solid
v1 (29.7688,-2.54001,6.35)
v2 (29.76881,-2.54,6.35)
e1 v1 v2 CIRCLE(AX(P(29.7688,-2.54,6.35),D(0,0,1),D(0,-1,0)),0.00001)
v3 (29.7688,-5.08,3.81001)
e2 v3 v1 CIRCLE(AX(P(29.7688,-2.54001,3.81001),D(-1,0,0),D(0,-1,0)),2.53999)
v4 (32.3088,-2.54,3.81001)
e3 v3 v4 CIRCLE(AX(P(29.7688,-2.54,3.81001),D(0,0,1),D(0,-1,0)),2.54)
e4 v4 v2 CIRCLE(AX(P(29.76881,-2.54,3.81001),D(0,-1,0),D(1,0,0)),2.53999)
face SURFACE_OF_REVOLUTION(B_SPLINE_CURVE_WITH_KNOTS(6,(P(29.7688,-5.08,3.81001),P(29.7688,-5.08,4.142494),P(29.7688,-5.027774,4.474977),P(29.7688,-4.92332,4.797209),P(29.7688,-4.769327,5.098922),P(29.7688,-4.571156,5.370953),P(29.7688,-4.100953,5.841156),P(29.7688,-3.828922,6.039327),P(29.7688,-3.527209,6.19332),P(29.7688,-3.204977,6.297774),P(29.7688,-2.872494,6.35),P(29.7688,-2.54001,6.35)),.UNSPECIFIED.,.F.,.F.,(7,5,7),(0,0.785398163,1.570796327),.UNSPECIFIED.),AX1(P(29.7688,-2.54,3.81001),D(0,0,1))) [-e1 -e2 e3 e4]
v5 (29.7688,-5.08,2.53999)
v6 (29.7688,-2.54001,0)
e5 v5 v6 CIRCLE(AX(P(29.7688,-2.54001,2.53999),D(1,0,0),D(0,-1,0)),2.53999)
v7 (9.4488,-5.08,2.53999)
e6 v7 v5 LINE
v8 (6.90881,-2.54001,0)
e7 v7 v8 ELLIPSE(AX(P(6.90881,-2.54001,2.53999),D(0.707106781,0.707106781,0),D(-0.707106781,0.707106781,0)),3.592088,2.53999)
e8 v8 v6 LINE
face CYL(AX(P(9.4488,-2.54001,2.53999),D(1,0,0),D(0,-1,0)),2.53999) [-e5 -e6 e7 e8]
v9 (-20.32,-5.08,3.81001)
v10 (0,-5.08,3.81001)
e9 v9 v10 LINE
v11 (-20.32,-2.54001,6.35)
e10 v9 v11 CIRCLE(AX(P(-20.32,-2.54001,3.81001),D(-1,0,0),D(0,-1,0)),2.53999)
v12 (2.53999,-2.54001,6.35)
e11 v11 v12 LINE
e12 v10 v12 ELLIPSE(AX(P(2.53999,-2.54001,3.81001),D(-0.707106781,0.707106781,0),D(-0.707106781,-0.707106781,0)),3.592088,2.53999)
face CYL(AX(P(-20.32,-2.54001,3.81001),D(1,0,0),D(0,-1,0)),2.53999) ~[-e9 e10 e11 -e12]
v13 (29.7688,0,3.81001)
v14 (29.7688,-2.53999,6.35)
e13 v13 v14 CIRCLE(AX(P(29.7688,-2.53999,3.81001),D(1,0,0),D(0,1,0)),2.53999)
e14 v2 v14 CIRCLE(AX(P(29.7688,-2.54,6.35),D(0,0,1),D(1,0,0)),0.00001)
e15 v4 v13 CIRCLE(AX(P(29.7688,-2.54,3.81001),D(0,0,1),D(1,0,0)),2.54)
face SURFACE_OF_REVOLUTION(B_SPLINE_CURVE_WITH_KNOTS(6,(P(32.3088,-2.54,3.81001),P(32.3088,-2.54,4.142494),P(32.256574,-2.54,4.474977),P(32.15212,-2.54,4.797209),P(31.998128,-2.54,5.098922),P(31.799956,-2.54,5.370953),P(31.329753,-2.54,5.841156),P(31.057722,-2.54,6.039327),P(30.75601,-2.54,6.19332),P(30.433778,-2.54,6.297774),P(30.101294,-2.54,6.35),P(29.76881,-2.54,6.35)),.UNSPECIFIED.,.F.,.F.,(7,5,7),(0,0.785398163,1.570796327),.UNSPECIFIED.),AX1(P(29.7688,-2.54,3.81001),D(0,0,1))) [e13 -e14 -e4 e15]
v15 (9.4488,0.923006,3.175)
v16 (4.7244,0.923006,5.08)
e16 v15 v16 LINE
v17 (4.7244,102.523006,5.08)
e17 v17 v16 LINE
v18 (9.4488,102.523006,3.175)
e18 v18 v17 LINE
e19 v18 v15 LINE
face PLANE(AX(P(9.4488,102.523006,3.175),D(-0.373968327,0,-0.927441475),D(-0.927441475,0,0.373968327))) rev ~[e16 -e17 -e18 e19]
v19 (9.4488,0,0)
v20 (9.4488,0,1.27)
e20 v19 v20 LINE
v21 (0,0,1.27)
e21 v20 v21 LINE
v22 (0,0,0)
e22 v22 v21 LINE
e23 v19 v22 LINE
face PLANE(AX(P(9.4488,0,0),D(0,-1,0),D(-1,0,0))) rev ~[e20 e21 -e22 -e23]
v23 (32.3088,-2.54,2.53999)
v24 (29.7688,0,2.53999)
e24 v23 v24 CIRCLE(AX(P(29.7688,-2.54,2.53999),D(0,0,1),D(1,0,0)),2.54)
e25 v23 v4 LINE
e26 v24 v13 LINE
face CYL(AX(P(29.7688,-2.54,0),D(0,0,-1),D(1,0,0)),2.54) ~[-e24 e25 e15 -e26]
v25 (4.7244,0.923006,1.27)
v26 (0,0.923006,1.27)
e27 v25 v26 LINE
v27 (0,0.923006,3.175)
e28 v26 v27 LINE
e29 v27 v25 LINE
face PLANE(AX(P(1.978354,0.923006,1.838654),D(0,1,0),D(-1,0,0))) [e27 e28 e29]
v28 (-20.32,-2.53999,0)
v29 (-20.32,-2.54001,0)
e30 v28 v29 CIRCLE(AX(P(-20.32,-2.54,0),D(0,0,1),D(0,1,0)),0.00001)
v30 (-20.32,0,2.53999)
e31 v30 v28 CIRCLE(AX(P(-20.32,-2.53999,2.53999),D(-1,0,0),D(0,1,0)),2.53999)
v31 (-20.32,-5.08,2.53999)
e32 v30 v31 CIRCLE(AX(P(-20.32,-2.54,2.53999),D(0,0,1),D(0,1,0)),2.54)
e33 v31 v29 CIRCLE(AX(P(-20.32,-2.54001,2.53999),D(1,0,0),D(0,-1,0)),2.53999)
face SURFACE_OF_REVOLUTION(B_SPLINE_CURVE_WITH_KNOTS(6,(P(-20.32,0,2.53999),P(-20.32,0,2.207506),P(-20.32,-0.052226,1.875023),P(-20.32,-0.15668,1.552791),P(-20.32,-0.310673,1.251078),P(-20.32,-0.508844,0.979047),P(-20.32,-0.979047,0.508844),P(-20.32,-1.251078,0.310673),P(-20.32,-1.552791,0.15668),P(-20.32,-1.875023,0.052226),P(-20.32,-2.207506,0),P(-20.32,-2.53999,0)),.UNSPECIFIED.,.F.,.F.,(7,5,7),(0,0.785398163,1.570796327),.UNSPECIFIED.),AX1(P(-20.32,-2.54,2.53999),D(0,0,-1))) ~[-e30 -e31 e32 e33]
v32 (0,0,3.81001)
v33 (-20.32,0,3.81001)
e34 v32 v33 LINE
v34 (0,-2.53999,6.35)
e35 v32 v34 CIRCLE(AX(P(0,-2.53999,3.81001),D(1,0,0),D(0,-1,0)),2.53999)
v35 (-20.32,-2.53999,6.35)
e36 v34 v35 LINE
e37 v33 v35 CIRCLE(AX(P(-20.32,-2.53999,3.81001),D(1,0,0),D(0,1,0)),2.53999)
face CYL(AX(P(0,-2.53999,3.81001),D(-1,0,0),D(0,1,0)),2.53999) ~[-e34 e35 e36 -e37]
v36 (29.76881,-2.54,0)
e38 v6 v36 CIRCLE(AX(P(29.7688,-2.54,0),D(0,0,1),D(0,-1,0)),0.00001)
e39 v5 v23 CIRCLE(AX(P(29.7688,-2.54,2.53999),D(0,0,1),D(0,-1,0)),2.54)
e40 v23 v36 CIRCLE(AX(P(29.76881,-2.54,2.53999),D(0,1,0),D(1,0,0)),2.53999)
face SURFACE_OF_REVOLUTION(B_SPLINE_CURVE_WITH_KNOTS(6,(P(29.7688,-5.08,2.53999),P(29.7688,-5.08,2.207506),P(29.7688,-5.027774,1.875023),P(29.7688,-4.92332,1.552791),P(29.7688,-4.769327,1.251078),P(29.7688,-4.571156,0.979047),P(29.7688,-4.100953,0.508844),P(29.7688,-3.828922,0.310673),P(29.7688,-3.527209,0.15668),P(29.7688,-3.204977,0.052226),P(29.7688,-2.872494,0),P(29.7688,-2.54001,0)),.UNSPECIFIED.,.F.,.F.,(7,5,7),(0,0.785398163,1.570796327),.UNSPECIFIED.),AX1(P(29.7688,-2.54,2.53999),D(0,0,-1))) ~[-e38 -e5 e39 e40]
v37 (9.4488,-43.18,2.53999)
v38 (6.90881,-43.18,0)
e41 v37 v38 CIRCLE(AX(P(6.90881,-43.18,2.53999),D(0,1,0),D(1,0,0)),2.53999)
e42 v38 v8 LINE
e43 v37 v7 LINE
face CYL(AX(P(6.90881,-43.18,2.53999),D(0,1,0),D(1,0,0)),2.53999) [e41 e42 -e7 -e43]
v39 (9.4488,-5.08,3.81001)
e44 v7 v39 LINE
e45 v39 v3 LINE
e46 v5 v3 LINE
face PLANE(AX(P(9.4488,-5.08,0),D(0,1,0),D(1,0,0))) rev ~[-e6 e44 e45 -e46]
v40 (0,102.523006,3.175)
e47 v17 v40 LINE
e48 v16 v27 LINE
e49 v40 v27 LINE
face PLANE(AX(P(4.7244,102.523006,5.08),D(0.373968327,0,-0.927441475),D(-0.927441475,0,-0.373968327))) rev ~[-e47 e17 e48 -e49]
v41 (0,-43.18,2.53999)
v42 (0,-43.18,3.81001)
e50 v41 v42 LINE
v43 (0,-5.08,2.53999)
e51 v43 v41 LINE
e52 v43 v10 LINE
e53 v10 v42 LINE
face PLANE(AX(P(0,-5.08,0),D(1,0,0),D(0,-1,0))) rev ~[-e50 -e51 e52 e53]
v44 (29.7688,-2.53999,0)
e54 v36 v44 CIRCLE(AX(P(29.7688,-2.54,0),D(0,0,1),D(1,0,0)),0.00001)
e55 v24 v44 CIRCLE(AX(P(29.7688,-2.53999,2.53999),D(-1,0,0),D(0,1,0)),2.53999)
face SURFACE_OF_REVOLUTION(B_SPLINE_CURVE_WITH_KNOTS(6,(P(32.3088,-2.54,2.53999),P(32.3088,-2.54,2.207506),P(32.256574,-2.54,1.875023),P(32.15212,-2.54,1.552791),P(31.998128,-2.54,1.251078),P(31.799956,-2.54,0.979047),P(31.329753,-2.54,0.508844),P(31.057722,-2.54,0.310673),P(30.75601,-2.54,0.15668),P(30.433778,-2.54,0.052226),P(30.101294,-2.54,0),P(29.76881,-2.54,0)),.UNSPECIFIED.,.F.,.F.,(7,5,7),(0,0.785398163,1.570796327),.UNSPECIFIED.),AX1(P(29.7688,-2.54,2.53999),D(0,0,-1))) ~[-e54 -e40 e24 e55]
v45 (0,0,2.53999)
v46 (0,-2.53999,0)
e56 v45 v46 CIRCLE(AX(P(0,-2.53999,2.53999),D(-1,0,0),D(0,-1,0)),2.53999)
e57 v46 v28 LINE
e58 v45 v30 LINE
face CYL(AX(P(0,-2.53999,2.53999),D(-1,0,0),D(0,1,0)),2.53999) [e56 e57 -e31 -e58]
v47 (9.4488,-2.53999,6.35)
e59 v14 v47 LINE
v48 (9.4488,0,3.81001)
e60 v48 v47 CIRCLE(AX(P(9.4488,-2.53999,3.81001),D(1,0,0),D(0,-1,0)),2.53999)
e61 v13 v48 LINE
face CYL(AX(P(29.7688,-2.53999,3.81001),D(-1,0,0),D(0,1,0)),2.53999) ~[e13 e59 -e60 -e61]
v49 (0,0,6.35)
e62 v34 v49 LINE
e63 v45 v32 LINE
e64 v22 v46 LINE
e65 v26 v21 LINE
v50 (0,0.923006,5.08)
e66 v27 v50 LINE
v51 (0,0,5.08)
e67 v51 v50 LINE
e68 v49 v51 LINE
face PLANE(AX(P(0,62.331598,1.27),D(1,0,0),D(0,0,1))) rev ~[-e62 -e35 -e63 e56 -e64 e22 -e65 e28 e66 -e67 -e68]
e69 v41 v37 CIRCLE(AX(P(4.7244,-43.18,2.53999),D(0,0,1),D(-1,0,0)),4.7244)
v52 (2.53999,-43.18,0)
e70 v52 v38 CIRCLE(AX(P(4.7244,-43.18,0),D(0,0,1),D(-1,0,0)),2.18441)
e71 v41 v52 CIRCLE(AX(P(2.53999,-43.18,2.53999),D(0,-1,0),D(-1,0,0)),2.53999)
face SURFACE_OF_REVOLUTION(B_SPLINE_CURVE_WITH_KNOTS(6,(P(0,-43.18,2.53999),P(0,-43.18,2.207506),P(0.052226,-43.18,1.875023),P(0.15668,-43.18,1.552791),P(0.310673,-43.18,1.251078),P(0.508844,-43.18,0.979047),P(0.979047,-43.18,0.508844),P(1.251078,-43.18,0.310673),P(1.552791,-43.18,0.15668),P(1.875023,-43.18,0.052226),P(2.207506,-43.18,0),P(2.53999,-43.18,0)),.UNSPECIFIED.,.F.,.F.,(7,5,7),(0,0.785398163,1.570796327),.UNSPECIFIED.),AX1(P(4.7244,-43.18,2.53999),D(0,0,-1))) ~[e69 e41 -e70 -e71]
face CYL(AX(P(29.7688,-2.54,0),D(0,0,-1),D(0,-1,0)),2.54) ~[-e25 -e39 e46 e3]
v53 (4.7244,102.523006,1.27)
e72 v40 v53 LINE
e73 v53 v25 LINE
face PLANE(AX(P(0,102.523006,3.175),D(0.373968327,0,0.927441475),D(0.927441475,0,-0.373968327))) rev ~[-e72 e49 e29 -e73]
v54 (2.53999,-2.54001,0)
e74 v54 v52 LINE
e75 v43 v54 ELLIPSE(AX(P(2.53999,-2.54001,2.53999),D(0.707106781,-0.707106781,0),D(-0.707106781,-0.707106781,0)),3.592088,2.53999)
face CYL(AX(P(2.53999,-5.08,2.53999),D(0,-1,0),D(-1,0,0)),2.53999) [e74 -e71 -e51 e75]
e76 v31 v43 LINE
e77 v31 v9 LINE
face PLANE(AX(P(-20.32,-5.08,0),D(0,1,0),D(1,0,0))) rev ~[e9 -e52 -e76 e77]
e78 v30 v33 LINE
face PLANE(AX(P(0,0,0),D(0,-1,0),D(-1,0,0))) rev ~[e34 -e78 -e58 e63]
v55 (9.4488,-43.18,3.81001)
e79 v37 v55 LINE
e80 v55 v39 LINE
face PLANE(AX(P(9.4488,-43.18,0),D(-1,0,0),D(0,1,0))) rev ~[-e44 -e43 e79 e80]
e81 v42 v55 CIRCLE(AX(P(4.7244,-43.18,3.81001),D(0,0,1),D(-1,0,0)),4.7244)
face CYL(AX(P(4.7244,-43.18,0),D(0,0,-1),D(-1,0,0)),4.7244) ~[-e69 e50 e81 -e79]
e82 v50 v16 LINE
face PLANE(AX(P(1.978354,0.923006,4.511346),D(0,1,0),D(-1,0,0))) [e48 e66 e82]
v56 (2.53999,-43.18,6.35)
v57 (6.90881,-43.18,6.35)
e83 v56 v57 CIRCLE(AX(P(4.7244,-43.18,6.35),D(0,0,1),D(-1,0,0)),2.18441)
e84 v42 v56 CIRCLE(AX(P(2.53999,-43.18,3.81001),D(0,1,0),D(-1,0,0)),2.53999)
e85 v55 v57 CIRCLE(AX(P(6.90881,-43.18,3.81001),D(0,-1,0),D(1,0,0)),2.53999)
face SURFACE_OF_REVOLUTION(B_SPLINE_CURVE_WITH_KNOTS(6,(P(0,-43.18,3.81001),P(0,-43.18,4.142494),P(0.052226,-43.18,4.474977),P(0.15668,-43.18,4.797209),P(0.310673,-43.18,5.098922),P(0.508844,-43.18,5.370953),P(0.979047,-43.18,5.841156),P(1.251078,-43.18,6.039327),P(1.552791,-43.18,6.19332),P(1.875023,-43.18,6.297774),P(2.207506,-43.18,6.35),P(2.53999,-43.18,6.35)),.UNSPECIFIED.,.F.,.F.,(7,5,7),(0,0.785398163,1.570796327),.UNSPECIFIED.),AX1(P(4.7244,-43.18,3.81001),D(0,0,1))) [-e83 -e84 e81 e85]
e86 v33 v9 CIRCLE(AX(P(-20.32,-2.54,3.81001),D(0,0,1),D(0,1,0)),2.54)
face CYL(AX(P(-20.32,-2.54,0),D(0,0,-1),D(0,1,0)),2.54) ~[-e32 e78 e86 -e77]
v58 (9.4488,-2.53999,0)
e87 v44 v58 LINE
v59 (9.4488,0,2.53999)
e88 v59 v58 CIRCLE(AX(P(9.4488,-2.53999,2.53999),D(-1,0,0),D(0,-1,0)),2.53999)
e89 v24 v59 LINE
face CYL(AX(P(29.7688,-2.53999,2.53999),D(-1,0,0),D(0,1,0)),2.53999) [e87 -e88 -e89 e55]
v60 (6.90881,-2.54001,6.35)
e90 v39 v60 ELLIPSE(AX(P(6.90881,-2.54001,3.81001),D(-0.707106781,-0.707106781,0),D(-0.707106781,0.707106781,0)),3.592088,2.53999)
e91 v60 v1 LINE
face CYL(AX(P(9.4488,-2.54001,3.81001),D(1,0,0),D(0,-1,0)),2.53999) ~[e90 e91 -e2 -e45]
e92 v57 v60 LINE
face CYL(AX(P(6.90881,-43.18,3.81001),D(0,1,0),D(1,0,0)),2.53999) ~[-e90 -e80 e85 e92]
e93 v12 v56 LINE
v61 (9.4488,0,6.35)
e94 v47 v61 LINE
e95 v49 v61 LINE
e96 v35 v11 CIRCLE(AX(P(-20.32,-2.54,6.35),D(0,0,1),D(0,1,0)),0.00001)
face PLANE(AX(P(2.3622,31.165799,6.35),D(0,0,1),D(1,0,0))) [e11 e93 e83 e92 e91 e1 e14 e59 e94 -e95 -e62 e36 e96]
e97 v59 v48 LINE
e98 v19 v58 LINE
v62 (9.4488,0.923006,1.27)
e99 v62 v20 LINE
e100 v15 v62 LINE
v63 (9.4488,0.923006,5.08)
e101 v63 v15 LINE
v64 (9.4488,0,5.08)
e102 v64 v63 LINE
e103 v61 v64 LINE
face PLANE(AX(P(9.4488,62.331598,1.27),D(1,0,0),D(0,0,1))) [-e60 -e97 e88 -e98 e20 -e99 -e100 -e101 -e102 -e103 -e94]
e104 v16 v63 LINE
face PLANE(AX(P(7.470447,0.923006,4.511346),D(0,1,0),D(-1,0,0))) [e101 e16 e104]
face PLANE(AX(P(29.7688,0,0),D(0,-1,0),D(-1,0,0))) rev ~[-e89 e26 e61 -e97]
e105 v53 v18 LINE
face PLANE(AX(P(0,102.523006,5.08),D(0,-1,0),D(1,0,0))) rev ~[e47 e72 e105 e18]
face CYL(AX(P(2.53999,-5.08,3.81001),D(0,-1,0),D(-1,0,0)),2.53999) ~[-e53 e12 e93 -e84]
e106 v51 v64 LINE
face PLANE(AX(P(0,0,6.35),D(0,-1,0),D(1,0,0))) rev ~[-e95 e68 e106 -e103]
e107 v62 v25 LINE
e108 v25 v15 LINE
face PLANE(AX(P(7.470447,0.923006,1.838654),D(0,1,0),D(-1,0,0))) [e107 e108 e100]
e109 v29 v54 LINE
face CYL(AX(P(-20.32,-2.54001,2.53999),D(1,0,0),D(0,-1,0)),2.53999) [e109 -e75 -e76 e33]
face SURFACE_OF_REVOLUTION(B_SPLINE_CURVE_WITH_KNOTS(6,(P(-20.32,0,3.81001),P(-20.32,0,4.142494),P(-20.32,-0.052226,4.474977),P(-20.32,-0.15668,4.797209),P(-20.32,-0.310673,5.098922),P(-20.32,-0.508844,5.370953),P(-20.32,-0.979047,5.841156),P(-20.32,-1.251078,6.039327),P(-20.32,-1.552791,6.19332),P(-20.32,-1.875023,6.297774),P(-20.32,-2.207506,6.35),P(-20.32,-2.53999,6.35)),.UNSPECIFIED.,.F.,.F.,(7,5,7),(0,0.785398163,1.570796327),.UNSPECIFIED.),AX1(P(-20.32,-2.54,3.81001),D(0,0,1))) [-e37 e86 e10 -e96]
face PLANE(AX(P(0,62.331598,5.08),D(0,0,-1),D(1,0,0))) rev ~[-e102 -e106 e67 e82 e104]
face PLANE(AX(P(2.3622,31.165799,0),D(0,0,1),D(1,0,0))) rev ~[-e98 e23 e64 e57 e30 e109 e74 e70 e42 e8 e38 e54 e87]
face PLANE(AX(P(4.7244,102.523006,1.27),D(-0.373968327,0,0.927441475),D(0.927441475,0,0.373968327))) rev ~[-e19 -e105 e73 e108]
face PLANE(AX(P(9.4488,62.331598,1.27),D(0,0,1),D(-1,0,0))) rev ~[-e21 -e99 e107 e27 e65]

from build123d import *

# Parameters (mm, degrees)
F0_W      = 4.724400118
F0_H      = 62.3315982521
F1_DEPTH  = 6.35
F2_R      = 2.53999
F4_DEPTH  = 1.27
F6_DEPTH  = 1.27
F8_DEPTH  = 25.4
F9_DEPTH  = 50.8
F11_DEPTH = 25.4
F13_DEPTH = 25.4
F15_DEPTH = 101.6


# Not quite as in the source:
# - a fillet or chamfer is up to 0.001 mm smaller than in the source, because OpenCascade refuses the exact size


with BuildPart() as f1:
    # F0 (on Top) → F1 (new body)
    with BuildSketch(Plane.XY):
        with Locations((2.362200059, 31.165799126)):
            Rectangle(F0_W, F0_H)
        with Locations((7.086600177, 31.165799126)):
            Rectangle(F0_W, F0_H)
        Polygon((4.724400118, 75.0454813242), (4.724400118, 62.3315982521), (9.448800236, 62.3315982521), align=None)
        Polygon((4.724400118, 75.0454813242), (0, 62.3315982521), (4.724400118, 62.3315982521), align=None)
        with BuildLine():
            Line((4.724400118, 0), (0, 0))
            Line((0, 0), (-20.32, 0))
            ThreePointArc((-20.32, 0), (-18.5239487758, -0.7439487758), (-17.78, -2.54))
            ThreePointArc((-17.78, -2.54), (-18.5239487758, -4.3360512242), (-20.32, -5.08))
            Line((-20.32, -5.08), (0, -5.08))
            Line((0, -5.08), (9.448800236, -5.08))
            Line((9.448800236, -5.08), (29.768800236, -5.08))
            ThreePointArc((29.768800236, -5.08), (27.228800236, -2.54), (29.768800236, 0))
            Line((29.768800236, 0), (9.448800236, 0))
            Line((9.448800236, 0), (4.724400118, 0))
        make_face()
        with BuildLine():
            Line((9.448800236, -5.08), (0, -5.08))
            Line((0, -5.08), (0, -43.18))
            ThreePointArc((0, -43.18), (4.724400118, -38.455599882), (9.448800236, -43.18))
            Line((9.448800236, -43.18), (9.448800236, -5.08))
        make_face()
        with BuildLine():
            ThreePointArc((-17.78, -2.54), (-18.5239487758, -0.7439487758), (-20.32, 0))
            Line((-20.32, 0), (-20.32, -5.08))
            ThreePointArc((-20.32, -5.08), (-18.5239487758, -4.3360512242), (-17.78, -2.54))
        make_face()
        with BuildLine():
            Line((-20.32, -5.08), (-20.32, 0))
            ThreePointArc((-20.32, 0), (-22.86, -2.54), (-20.32, -5.08))
        make_face()
        with BuildLine():
            Line((29.768800236, -5.08), (29.768800236, 0))
            ThreePointArc((29.768800236, 0), (27.228800236, -2.54), (29.768800236, -5.08))
        make_face()
        with BuildLine():
            ThreePointArc((32.308800236, -2.54), (31.5648514602, -0.7439487758), (29.768800236, 0))
            Line((29.768800236, 0), (29.768800236, -5.08))
            ThreePointArc((29.768800236, -5.08), (31.5648514602, -4.3360512242), (32.308800236, -2.54))
        make_face()
        with BuildLine():
            Line((9.448800236, -43.18), (0, -43.18))
            ThreePointArc((0, -43.18), (4.724400118, -47.904400118), (9.448800236, -43.18))
        make_face()
        with BuildLine():
            ThreePointArc((9.448800236, -43.18), (4.724400118, -38.455599882), (0, -43.18))
            Line((0, -43.18), (9.448800236, -43.18))
        make_face()
    extrude(amount=F1_DEPTH)

    # F2 (radius 2.54 in the source; OpenCascade refuses exactly that, so slightly less here)
    f2_edges = [f1.edges().sort_by_distance(p)[0] for p in [
        (0, -24.13, 6.35),
        (9.4488, -24.13, 6.35),
        (0, -24.13, 0),
        (9.4488, -24.13, 0),
        (19.6088, -5.08, 0),
        (19.6088, 0, 0),
        (-10.16, 0, 0),
        (19.6088, -5.08, 6.35),
        (19.6088, 0, 6.35),
        (-10.16, -5.08, 6.35),
        (-10.16, 0, 6.35),
        (-10.16, -5.08, 0),
    ]]
    fillet(f2_edges, radius=F2_R)

    # F3 (on face) → F4 (cut)
    with BuildSketch(Plane.XY.offset(6.35)):
        Polygon((0, 62.3315982521), (0, 0), (9.448800236, 0), (9.448800236, 62.3315982521), (4.724400118, 75.0454813242), align=None)
    extrude(amount=-F4_DEPTH, mode=Mode.SUBTRACT)

    # F5 (on face) → F6 (cut)
    with BuildSketch(Plane(origin=(0, 0, 0), x_dir=(1, 0, 0), z_dir=(0, 0, -1))):
        Polygon((9.448800236, 0), (0, 0), (0, -62.3315982521), (4.724400118, -75.0454813242), (9.448800236, -62.3315982521), align=None)
    extrude(amount=-F6_DEPTH, mode=Mode.SUBTRACT)

    # F7 (on face) → F8 (cut)
    with BuildSketch(Plane.XY.offset(5.08)):
        Polygon((4.724400118, 75.0454813242), (0, 62.3315982521), (9.448800236, 62.3315982521), align=None)
    extrude(amount=-F8_DEPTH, mode=Mode.SUBTRACT)

    # F9 (add): a face of the model
    f9_faces = [f1.faces().sort_by_distance(p)[0] for p in [
        (4.724400118, 62.3315982521, 3.175),
    ]]
    extrude(f9_faces, amount=F9_DEPTH)

    # F10 (on face) → F11 (cut)
    with BuildSketch(Plane.XY.offset(5.08)):
        Polygon((0, 102.5230064988), (4.724400118, 113.1315982521), (0, 113.1315982521), align=None)
        Polygon((9.448800236, 113.1315982521), (4.724400118, 113.1315982521), (9.448800236, 102.5230064988), align=None)
    extrude(amount=-F11_DEPTH, mode=Mode.SUBTRACT)

    # F12 (on face) → F13 (cut)
    with BuildSketch(Plane.XY.offset(5.08)):
        Polygon((4.724400118, 113.1315982521), (0, 102.5230064988), (9.448800236, 102.5230064988), align=None)
    extrude(amount=-F13_DEPTH, mode=Mode.SUBTRACT)

    # F14 (on face) → F15 (cut)
    with BuildSketch(Plane(origin=(0, 102.5230064988, 0), x_dir=(-1, 0, 0), z_dir=(0, 1, 0))):
        Polygon((0, 5.08), (-4.724400118, 5.08), (0, 3.175), align=None)
        Polygon((0, 1.27), (0, 3.175), (-4.724400118, 1.27), align=None)
        Polygon((-4.724400118, 1.27), (-9.448800236, 3.175), (-9.448800236, 1.27), align=None)
        Polygon((-9.448800236, 3.175), (-4.724400118, 5.08), (-9.448800236, 5.08), align=None)
    extrude(amount=-F15_DEPTH, mode=Mode.SUBTRACT)


solid = f1.part
